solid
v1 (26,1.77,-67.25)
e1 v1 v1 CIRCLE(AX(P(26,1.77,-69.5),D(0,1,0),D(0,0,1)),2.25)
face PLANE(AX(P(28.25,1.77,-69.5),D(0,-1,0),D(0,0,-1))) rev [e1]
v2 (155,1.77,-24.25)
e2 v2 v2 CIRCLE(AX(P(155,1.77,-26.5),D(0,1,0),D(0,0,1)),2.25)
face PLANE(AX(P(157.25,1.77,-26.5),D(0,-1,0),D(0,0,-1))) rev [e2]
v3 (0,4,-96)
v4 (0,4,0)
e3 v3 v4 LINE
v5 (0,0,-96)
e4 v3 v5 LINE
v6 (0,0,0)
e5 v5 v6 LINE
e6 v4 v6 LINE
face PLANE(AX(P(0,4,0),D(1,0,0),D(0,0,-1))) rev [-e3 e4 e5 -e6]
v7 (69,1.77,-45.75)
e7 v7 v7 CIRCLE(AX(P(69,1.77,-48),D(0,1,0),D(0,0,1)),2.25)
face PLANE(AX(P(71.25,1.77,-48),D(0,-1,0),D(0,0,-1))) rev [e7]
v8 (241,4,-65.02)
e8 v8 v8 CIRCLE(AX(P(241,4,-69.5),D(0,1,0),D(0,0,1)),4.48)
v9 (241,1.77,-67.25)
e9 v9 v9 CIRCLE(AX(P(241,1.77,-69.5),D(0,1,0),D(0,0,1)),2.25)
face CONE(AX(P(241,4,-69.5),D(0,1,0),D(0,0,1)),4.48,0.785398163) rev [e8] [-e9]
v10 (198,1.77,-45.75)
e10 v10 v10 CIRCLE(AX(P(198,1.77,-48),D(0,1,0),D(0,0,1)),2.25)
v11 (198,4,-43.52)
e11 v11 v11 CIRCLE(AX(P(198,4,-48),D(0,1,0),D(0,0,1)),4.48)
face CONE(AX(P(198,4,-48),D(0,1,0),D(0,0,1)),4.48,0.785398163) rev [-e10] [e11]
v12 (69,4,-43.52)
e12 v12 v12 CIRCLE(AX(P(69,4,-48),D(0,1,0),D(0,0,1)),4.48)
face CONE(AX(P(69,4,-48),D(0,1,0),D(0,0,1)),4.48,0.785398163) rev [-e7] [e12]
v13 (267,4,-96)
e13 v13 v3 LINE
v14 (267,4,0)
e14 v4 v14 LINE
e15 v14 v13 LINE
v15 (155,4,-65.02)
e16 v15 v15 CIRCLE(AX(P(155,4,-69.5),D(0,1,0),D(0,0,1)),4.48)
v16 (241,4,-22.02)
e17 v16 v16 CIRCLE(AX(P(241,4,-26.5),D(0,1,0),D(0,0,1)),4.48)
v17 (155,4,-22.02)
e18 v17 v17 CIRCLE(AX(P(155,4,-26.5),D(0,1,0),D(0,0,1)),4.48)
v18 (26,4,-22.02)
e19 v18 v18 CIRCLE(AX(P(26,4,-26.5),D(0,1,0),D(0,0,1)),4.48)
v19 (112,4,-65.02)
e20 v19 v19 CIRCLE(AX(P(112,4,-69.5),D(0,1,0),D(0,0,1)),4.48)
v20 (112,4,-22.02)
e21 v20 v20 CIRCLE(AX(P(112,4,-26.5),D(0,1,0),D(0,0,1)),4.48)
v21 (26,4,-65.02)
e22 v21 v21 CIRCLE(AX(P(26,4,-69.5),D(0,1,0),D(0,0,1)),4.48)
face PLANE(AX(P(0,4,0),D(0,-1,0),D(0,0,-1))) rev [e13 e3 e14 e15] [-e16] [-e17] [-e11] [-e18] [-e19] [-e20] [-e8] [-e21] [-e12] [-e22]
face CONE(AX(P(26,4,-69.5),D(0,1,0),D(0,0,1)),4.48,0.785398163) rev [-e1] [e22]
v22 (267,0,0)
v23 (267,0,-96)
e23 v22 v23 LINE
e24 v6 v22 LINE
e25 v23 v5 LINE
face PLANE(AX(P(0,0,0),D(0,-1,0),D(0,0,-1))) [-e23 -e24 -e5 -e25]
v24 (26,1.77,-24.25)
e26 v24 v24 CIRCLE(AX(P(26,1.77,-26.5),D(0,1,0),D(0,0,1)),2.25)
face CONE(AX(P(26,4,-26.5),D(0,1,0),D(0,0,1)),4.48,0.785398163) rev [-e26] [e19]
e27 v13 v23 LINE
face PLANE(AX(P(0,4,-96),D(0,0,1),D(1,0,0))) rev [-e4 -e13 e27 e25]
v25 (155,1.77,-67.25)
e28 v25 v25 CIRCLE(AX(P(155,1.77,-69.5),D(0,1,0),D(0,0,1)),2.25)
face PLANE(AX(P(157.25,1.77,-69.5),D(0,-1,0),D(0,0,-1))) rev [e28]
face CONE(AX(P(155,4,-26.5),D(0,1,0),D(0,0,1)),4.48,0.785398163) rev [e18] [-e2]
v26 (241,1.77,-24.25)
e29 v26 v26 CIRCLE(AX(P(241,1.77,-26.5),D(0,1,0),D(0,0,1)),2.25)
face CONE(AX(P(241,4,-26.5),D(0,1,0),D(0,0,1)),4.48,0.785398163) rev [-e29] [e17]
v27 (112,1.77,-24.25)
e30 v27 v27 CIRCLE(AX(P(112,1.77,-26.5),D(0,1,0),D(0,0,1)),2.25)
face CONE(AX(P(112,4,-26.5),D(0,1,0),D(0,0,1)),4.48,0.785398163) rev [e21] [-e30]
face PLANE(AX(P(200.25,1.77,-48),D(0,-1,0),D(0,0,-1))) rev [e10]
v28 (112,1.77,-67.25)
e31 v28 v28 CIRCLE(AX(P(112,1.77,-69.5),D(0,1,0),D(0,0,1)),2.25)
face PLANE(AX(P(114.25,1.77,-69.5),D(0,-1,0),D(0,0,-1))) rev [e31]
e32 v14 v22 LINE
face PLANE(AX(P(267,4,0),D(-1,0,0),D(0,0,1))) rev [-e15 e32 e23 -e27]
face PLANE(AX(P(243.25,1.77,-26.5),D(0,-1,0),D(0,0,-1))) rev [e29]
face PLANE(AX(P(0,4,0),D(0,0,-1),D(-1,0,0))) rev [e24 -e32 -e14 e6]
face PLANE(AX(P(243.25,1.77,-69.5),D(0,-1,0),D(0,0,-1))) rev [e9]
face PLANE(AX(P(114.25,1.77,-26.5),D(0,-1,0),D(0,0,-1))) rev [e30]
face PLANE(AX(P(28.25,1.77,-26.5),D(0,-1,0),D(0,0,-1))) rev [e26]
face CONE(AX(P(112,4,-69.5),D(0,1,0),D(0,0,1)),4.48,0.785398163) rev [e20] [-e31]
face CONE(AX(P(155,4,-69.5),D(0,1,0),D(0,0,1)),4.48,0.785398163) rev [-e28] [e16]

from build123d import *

# Parameters (mm, degrees)
SKETCH1_W                  = 267
SKETCH1_H                  = 96
BOSS_EXTRUDE1_DEPTH        = 4
ADVANCEDHOLE2_OUTLINE_R    = 2.25
ADVANCEDHOLE2_DEPTH        = 2.23
ADVANCEDHOLE2_DRAFT        = -45
ADVANCEDHOLE2_2_OUTLINE_R  = 2.25
ADVANCEDHOLE2_2_DEPTH      = 2.23
ADVANCEDHOLE2_2_DRAFT      = -45
ADVANCEDHOLE2_3_OUTLINE_R  = 2.25
ADVANCEDHOLE2_3_DEPTH      = 2.23
ADVANCEDHOLE2_3_DRAFT      = -45
ADVANCEDHOLE2_4_OUTLINE_R  = 2.25
ADVANCEDHOLE2_4_DEPTH      = 2.23
ADVANCEDHOLE2_4_DRAFT      = -45
ADVANCEDHOLE2_5_OUTLINE_R  = 2.25
ADVANCEDHOLE2_5_DEPTH      = 2.23
ADVANCEDHOLE2_5_DRAFT      = -45
ADVANCEDHOLE2_6_OUTLINE_R  = 2.25
ADVANCEDHOLE2_6_DEPTH      = 2.23
ADVANCEDHOLE2_6_DRAFT      = -45
ADVANCEDHOLE2_7_OUTLINE_R  = 2.25
ADVANCEDHOLE2_7_DEPTH      = 2.23
ADVANCEDHOLE2_7_DRAFT      = -45
ADVANCEDHOLE2_8_OUTLINE_R  = 2.25
ADVANCEDHOLE2_8_DEPTH      = 2.23
ADVANCEDHOLE2_8_DRAFT      = -45
ADVANCEDHOLE2_9_OUTLINE_R  = 2.25
ADVANCEDHOLE2_9_DEPTH      = 2.23
ADVANCEDHOLE2_9_DRAFT      = -45
ADVANCEDHOLE2_10_OUTLINE_R = 2.25
ADVANCEDHOLE2_10_DEPTH     = 2.23
ADVANCEDHOLE2_10_DRAFT     = -45


# Read off the part's stored shape, not the designer's step: AdvancedHole2
with BuildPart() as part:
    # Sketch1 → Boss-Extrude1 (new body)
    with BuildSketch(Plane(origin=(0, 0, 0), x_dir=(1, 0, 0), z_dir=(0, 1, 0))):
        with Locations((133.5, 48)):
            Rectangle(SKETCH1_W, SKETCH1_H)
    extrude(amount=BOSS_EXTRUDE1_DEPTH)


with BuildPart() as advancedhole2_tool:
    # AdvancedHole2 outline → AdvancedHole2 (with draft: the straight prism first)
    with BuildSketch(Plane(origin=(0, 1.77, 0), x_dir=(1, 0, 0), z_dir=(0, 1, 0))):
        with Locations((241, 26.5)):
            Circle(ADVANCEDHOLE2_OUTLINE_R)
    extrude(amount=ADVANCEDHOLE2_DEPTH)
    # AdvancedHole2: the draft: its side faces are tilted about the plane it starts from
    advancedhole2_sides = [advancedhole2_tool.faces().sort_by_distance(p)[0] for p in [
        (238.75, 2.885, -26.5),
    ]]
    draft(advancedhole2_sides, Plane(origin=(0, 1.77, 0), x_dir=(1, 0, 0), z_dir=(0, 1, 0)), ADVANCEDHOLE2_DRAFT)


with BuildPart() as part_1:
    add(part.part)

    # AdvancedHole2: cut by advancedhole2_tool
    add(advancedhole2_tool.part, mode=Mode.SUBTRACT)


with BuildPart() as advancedhole2_2_tool:
    # AdvancedHole2 2 outline → AdvancedHole2 2 (with draft: the straight prism first)
    with BuildSketch(Plane(origin=(0, 1.77, 0), x_dir=(1, 0, 0), z_dir=(0, 1, 0))):
        with Locations((198, 48)):
            Circle(ADVANCEDHOLE2_2_OUTLINE_R)
    extrude(amount=ADVANCEDHOLE2_2_DEPTH)
    # AdvancedHole2 2: the draft: its side faces are tilted about the plane it starts from
    advancedhole2_2_sides = [advancedhole2_2_tool.faces().sort_by_distance(p)[0] for p in [
        (195.75, 2.885, -48),
    ]]
    draft(advancedhole2_2_sides, Plane(origin=(0, 1.77, 0), x_dir=(1, 0, 0), z_dir=(0, 1, 0)), ADVANCEDHOLE2_2_DRAFT)


with BuildPart() as part_2:
    add(part_1.part)

    # AdvancedHole2 2: cut by advancedhole2_2_tool
    add(advancedhole2_2_tool.part, mode=Mode.SUBTRACT)


with BuildPart() as advancedhole2_3_tool:
    # AdvancedHole2 3 outline → AdvancedHole2 3 (with draft: the straight prism first)
    with BuildSketch(Plane(origin=(0, 1.77, 0), x_dir=(1, 0, 0), z_dir=(0, 1, 0))):
        with Locations((241, 69.5)):
            Circle(ADVANCEDHOLE2_3_OUTLINE_R)
    extrude(amount=ADVANCEDHOLE2_3_DEPTH)
    # AdvancedHole2 3: the draft: its side faces are tilted about the plane it starts from
    advancedhole2_3_sides = [advancedhole2_3_tool.faces().sort_by_distance(p)[0] for p in [
        (238.75, 2.885, -69.5),
    ]]
    draft(advancedhole2_3_sides, Plane(origin=(0, 1.77, 0), x_dir=(1, 0, 0), z_dir=(0, 1, 0)), ADVANCEDHOLE2_3_DRAFT)


with BuildPart() as part_3:
    add(part_2.part)

    # AdvancedHole2 3: cut by advancedhole2_3_tool
    add(advancedhole2_3_tool.part, mode=Mode.SUBTRACT)


with BuildPart() as advancedhole2_4_tool:
    # AdvancedHole2 4 outline → AdvancedHole2 4 (with draft: the straight prism first)
    with BuildSketch(Plane(origin=(0, 1.77, 0), x_dir=(1, 0, 0), z_dir=(0, 1, 0))):
        with Locations((155, 69.5)):
            Circle(ADVANCEDHOLE2_4_OUTLINE_R)
    extrude(amount=ADVANCEDHOLE2_4_DEPTH)
    # AdvancedHole2 4: the draft: its side faces are tilted about the plane it starts from
    advancedhole2_4_sides = [advancedhole2_4_tool.faces().sort_by_distance(p)[0] for p in [
        (152.75, 2.885, -69.5),
    ]]
    draft(advancedhole2_4_sides, Plane(origin=(0, 1.77, 0), x_dir=(1, 0, 0), z_dir=(0, 1, 0)), ADVANCEDHOLE2_4_DRAFT)


with BuildPart() as part_4:
    add(part_3.part)

    # AdvancedHole2 4: cut by advancedhole2_4_tool
    add(advancedhole2_4_tool.part, mode=Mode.SUBTRACT)


with BuildPart() as advancedhole2_5_tool:
    # AdvancedHole2 5 outline → AdvancedHole2 5 (with draft: the straight prism first)
    with BuildSketch(Plane(origin=(0, 1.77, 0), x_dir=(1, 0, 0), z_dir=(0, 1, 0))):
        with Locations((155, 26.5)):
            Circle(ADVANCEDHOLE2_5_OUTLINE_R)
    extrude(amount=ADVANCEDHOLE2_5_DEPTH)
    # AdvancedHole2 5: the draft: its side faces are tilted about the plane it starts from
    advancedhole2_5_sides = [advancedhole2_5_tool.faces().sort_by_distance(p)[0] for p in [
        (152.75, 2.885, -26.5),
    ]]
    draft(advancedhole2_5_sides, Plane(origin=(0, 1.77, 0), x_dir=(1, 0, 0), z_dir=(0, 1, 0)), ADVANCEDHOLE2_5_DRAFT)


with BuildPart() as part_5:
    add(part_4.part)

    # AdvancedHole2 5: cut by advancedhole2_5_tool
    add(advancedhole2_5_tool.part, mode=Mode.SUBTRACT)


with BuildPart() as advancedhole2_6_tool:
    # AdvancedHole2 6 outline → AdvancedHole2 6 (with draft: the straight prism first)
    with BuildSketch(Plane(origin=(0, 1.77, 0), x_dir=(1, 0, 0), z_dir=(0, 1, 0))):
        with Locations((112, 26.5)):
            Circle(ADVANCEDHOLE2_6_OUTLINE_R)
    extrude(amount=ADVANCEDHOLE2_6_DEPTH)
    # AdvancedHole2 6: the draft: its side faces are tilted about the plane it starts from
    advancedhole2_6_sides = [advancedhole2_6_tool.faces().sort_by_distance(p)[0] for p in [
        (109.75, 2.885, -26.5),
    ]]
    draft(advancedhole2_6_sides, Plane(origin=(0, 1.77, 0), x_dir=(1, 0, 0), z_dir=(0, 1, 0)), ADVANCEDHOLE2_6_DRAFT)


with BuildPart() as part_6:
    add(part_5.part)

    # AdvancedHole2 6: cut by advancedhole2_6_tool
    add(advancedhole2_6_tool.part, mode=Mode.SUBTRACT)


with BuildPart() as advancedhole2_7_tool:
    # AdvancedHole2 7 outline → AdvancedHole2 7 (with draft: the straight prism first)
    with BuildSketch(Plane(origin=(0, 1.77, 0), x_dir=(1, 0, 0), z_dir=(0, 1, 0))):
        with Locations((112, 69.5)):
            Circle(ADVANCEDHOLE2_7_OUTLINE_R)
    extrude(amount=ADVANCEDHOLE2_7_DEPTH)
    # AdvancedHole2 7: the draft: its side faces are tilted about the plane it starts from
    advancedhole2_7_sides = [advancedhole2_7_tool.faces().sort_by_distance(p)[0] for p in [
        (109.75, 2.885, -69.5),
    ]]
    draft(advancedhole2_7_sides, Plane(origin=(0, 1.77, 0), x_dir=(1, 0, 0), z_dir=(0, 1, 0)), ADVANCEDHOLE2_7_DRAFT)


with BuildPart() as part_7:
    add(part_6.part)

    # AdvancedHole2 7: cut by advancedhole2_7_tool
    add(advancedhole2_7_tool.part, mode=Mode.SUBTRACT)


with BuildPart() as advancedhole2_8_tool:
    # AdvancedHole2 8 outline → AdvancedHole2 8 (with draft: the straight prism first)
    with BuildSketch(Plane(origin=(0, 1.77, 0), x_dir=(1, 0, 0), z_dir=(0, 1, 0))):
        with Locations((69, 48)):
            Circle(ADVANCEDHOLE2_8_OUTLINE_R)
    extrude(amount=ADVANCEDHOLE2_8_DEPTH)
    # AdvancedHole2 8: the draft: its side faces are tilted about the plane it starts from
    advancedhole2_8_sides = [advancedhole2_8_tool.faces().sort_by_distance(p)[0] for p in [
        (66.75, 2.885, -48),
    ]]
    draft(advancedhole2_8_sides, Plane(origin=(0, 1.77, 0), x_dir=(1, 0, 0), z_dir=(0, 1, 0)), ADVANCEDHOLE2_8_DRAFT)


with BuildPart() as part_8:
    add(part_7.part)

    # AdvancedHole2 8: cut by advancedhole2_8_tool
    add(advancedhole2_8_tool.part, mode=Mode.SUBTRACT)


with BuildPart() as advancedhole2_9_tool:
    # AdvancedHole2 9 outline → AdvancedHole2 9 (with draft: the straight prism first)
    with BuildSketch(Plane(origin=(0, 1.77, 0), x_dir=(1, 0, 0), z_dir=(0, 1, 0))):
        with Locations((26, 26.5)):
            Circle(ADVANCEDHOLE2_9_OUTLINE_R)
    extrude(amount=ADVANCEDHOLE2_9_DEPTH)
    # AdvancedHole2 9: the draft: its side faces are tilted about the plane it starts from
    advancedhole2_9_sides = [advancedhole2_9_tool.faces().sort_by_distance(p)[0] for p in [
        (23.75, 2.885, -26.5),
    ]]
    draft(advancedhole2_9_sides, Plane(origin=(0, 1.77, 0), x_dir=(1, 0, 0), z_dir=(0, 1, 0)), ADVANCEDHOLE2_9_DRAFT)


with BuildPart() as part_9:
    add(part_8.part)

    # AdvancedHole2 9: cut by advancedhole2_9_tool
    add(advancedhole2_9_tool.part, mode=Mode.SUBTRACT)


with BuildPart() as advancedhole2_10_tool:
    # AdvancedHole2 10 outline → AdvancedHole2 10 (with draft: the straight prism first)
    with BuildSketch(Plane(origin=(0, 1.77, 0), x_dir=(1, 0, 0), z_dir=(0, 1, 0))):
        with Locations((26, 69.5)):
            Circle(ADVANCEDHOLE2_10_OUTLINE_R)
    extrude(amount=ADVANCEDHOLE2_10_DEPTH)
    # AdvancedHole2 10: the draft: its side faces are tilted about the plane it starts from
    advancedhole2_10_sides = [advancedhole2_10_tool.faces().sort_by_distance(p)[0] for p in [
        (23.75, 2.885, -69.5),
    ]]
    draft(advancedhole2_10_sides, Plane(origin=(0, 1.77, 0), x_dir=(1, 0, 0), z_dir=(0, 1, 0)), ADVANCEDHOLE2_10_DRAFT)


with BuildPart() as part_10:
    add(part_9.part)

    # AdvancedHole2 10: cut by advancedhole2_10_tool
    add(advancedhole2_10_tool.part, mode=Mode.SUBTRACT)


solid = part_10.part
